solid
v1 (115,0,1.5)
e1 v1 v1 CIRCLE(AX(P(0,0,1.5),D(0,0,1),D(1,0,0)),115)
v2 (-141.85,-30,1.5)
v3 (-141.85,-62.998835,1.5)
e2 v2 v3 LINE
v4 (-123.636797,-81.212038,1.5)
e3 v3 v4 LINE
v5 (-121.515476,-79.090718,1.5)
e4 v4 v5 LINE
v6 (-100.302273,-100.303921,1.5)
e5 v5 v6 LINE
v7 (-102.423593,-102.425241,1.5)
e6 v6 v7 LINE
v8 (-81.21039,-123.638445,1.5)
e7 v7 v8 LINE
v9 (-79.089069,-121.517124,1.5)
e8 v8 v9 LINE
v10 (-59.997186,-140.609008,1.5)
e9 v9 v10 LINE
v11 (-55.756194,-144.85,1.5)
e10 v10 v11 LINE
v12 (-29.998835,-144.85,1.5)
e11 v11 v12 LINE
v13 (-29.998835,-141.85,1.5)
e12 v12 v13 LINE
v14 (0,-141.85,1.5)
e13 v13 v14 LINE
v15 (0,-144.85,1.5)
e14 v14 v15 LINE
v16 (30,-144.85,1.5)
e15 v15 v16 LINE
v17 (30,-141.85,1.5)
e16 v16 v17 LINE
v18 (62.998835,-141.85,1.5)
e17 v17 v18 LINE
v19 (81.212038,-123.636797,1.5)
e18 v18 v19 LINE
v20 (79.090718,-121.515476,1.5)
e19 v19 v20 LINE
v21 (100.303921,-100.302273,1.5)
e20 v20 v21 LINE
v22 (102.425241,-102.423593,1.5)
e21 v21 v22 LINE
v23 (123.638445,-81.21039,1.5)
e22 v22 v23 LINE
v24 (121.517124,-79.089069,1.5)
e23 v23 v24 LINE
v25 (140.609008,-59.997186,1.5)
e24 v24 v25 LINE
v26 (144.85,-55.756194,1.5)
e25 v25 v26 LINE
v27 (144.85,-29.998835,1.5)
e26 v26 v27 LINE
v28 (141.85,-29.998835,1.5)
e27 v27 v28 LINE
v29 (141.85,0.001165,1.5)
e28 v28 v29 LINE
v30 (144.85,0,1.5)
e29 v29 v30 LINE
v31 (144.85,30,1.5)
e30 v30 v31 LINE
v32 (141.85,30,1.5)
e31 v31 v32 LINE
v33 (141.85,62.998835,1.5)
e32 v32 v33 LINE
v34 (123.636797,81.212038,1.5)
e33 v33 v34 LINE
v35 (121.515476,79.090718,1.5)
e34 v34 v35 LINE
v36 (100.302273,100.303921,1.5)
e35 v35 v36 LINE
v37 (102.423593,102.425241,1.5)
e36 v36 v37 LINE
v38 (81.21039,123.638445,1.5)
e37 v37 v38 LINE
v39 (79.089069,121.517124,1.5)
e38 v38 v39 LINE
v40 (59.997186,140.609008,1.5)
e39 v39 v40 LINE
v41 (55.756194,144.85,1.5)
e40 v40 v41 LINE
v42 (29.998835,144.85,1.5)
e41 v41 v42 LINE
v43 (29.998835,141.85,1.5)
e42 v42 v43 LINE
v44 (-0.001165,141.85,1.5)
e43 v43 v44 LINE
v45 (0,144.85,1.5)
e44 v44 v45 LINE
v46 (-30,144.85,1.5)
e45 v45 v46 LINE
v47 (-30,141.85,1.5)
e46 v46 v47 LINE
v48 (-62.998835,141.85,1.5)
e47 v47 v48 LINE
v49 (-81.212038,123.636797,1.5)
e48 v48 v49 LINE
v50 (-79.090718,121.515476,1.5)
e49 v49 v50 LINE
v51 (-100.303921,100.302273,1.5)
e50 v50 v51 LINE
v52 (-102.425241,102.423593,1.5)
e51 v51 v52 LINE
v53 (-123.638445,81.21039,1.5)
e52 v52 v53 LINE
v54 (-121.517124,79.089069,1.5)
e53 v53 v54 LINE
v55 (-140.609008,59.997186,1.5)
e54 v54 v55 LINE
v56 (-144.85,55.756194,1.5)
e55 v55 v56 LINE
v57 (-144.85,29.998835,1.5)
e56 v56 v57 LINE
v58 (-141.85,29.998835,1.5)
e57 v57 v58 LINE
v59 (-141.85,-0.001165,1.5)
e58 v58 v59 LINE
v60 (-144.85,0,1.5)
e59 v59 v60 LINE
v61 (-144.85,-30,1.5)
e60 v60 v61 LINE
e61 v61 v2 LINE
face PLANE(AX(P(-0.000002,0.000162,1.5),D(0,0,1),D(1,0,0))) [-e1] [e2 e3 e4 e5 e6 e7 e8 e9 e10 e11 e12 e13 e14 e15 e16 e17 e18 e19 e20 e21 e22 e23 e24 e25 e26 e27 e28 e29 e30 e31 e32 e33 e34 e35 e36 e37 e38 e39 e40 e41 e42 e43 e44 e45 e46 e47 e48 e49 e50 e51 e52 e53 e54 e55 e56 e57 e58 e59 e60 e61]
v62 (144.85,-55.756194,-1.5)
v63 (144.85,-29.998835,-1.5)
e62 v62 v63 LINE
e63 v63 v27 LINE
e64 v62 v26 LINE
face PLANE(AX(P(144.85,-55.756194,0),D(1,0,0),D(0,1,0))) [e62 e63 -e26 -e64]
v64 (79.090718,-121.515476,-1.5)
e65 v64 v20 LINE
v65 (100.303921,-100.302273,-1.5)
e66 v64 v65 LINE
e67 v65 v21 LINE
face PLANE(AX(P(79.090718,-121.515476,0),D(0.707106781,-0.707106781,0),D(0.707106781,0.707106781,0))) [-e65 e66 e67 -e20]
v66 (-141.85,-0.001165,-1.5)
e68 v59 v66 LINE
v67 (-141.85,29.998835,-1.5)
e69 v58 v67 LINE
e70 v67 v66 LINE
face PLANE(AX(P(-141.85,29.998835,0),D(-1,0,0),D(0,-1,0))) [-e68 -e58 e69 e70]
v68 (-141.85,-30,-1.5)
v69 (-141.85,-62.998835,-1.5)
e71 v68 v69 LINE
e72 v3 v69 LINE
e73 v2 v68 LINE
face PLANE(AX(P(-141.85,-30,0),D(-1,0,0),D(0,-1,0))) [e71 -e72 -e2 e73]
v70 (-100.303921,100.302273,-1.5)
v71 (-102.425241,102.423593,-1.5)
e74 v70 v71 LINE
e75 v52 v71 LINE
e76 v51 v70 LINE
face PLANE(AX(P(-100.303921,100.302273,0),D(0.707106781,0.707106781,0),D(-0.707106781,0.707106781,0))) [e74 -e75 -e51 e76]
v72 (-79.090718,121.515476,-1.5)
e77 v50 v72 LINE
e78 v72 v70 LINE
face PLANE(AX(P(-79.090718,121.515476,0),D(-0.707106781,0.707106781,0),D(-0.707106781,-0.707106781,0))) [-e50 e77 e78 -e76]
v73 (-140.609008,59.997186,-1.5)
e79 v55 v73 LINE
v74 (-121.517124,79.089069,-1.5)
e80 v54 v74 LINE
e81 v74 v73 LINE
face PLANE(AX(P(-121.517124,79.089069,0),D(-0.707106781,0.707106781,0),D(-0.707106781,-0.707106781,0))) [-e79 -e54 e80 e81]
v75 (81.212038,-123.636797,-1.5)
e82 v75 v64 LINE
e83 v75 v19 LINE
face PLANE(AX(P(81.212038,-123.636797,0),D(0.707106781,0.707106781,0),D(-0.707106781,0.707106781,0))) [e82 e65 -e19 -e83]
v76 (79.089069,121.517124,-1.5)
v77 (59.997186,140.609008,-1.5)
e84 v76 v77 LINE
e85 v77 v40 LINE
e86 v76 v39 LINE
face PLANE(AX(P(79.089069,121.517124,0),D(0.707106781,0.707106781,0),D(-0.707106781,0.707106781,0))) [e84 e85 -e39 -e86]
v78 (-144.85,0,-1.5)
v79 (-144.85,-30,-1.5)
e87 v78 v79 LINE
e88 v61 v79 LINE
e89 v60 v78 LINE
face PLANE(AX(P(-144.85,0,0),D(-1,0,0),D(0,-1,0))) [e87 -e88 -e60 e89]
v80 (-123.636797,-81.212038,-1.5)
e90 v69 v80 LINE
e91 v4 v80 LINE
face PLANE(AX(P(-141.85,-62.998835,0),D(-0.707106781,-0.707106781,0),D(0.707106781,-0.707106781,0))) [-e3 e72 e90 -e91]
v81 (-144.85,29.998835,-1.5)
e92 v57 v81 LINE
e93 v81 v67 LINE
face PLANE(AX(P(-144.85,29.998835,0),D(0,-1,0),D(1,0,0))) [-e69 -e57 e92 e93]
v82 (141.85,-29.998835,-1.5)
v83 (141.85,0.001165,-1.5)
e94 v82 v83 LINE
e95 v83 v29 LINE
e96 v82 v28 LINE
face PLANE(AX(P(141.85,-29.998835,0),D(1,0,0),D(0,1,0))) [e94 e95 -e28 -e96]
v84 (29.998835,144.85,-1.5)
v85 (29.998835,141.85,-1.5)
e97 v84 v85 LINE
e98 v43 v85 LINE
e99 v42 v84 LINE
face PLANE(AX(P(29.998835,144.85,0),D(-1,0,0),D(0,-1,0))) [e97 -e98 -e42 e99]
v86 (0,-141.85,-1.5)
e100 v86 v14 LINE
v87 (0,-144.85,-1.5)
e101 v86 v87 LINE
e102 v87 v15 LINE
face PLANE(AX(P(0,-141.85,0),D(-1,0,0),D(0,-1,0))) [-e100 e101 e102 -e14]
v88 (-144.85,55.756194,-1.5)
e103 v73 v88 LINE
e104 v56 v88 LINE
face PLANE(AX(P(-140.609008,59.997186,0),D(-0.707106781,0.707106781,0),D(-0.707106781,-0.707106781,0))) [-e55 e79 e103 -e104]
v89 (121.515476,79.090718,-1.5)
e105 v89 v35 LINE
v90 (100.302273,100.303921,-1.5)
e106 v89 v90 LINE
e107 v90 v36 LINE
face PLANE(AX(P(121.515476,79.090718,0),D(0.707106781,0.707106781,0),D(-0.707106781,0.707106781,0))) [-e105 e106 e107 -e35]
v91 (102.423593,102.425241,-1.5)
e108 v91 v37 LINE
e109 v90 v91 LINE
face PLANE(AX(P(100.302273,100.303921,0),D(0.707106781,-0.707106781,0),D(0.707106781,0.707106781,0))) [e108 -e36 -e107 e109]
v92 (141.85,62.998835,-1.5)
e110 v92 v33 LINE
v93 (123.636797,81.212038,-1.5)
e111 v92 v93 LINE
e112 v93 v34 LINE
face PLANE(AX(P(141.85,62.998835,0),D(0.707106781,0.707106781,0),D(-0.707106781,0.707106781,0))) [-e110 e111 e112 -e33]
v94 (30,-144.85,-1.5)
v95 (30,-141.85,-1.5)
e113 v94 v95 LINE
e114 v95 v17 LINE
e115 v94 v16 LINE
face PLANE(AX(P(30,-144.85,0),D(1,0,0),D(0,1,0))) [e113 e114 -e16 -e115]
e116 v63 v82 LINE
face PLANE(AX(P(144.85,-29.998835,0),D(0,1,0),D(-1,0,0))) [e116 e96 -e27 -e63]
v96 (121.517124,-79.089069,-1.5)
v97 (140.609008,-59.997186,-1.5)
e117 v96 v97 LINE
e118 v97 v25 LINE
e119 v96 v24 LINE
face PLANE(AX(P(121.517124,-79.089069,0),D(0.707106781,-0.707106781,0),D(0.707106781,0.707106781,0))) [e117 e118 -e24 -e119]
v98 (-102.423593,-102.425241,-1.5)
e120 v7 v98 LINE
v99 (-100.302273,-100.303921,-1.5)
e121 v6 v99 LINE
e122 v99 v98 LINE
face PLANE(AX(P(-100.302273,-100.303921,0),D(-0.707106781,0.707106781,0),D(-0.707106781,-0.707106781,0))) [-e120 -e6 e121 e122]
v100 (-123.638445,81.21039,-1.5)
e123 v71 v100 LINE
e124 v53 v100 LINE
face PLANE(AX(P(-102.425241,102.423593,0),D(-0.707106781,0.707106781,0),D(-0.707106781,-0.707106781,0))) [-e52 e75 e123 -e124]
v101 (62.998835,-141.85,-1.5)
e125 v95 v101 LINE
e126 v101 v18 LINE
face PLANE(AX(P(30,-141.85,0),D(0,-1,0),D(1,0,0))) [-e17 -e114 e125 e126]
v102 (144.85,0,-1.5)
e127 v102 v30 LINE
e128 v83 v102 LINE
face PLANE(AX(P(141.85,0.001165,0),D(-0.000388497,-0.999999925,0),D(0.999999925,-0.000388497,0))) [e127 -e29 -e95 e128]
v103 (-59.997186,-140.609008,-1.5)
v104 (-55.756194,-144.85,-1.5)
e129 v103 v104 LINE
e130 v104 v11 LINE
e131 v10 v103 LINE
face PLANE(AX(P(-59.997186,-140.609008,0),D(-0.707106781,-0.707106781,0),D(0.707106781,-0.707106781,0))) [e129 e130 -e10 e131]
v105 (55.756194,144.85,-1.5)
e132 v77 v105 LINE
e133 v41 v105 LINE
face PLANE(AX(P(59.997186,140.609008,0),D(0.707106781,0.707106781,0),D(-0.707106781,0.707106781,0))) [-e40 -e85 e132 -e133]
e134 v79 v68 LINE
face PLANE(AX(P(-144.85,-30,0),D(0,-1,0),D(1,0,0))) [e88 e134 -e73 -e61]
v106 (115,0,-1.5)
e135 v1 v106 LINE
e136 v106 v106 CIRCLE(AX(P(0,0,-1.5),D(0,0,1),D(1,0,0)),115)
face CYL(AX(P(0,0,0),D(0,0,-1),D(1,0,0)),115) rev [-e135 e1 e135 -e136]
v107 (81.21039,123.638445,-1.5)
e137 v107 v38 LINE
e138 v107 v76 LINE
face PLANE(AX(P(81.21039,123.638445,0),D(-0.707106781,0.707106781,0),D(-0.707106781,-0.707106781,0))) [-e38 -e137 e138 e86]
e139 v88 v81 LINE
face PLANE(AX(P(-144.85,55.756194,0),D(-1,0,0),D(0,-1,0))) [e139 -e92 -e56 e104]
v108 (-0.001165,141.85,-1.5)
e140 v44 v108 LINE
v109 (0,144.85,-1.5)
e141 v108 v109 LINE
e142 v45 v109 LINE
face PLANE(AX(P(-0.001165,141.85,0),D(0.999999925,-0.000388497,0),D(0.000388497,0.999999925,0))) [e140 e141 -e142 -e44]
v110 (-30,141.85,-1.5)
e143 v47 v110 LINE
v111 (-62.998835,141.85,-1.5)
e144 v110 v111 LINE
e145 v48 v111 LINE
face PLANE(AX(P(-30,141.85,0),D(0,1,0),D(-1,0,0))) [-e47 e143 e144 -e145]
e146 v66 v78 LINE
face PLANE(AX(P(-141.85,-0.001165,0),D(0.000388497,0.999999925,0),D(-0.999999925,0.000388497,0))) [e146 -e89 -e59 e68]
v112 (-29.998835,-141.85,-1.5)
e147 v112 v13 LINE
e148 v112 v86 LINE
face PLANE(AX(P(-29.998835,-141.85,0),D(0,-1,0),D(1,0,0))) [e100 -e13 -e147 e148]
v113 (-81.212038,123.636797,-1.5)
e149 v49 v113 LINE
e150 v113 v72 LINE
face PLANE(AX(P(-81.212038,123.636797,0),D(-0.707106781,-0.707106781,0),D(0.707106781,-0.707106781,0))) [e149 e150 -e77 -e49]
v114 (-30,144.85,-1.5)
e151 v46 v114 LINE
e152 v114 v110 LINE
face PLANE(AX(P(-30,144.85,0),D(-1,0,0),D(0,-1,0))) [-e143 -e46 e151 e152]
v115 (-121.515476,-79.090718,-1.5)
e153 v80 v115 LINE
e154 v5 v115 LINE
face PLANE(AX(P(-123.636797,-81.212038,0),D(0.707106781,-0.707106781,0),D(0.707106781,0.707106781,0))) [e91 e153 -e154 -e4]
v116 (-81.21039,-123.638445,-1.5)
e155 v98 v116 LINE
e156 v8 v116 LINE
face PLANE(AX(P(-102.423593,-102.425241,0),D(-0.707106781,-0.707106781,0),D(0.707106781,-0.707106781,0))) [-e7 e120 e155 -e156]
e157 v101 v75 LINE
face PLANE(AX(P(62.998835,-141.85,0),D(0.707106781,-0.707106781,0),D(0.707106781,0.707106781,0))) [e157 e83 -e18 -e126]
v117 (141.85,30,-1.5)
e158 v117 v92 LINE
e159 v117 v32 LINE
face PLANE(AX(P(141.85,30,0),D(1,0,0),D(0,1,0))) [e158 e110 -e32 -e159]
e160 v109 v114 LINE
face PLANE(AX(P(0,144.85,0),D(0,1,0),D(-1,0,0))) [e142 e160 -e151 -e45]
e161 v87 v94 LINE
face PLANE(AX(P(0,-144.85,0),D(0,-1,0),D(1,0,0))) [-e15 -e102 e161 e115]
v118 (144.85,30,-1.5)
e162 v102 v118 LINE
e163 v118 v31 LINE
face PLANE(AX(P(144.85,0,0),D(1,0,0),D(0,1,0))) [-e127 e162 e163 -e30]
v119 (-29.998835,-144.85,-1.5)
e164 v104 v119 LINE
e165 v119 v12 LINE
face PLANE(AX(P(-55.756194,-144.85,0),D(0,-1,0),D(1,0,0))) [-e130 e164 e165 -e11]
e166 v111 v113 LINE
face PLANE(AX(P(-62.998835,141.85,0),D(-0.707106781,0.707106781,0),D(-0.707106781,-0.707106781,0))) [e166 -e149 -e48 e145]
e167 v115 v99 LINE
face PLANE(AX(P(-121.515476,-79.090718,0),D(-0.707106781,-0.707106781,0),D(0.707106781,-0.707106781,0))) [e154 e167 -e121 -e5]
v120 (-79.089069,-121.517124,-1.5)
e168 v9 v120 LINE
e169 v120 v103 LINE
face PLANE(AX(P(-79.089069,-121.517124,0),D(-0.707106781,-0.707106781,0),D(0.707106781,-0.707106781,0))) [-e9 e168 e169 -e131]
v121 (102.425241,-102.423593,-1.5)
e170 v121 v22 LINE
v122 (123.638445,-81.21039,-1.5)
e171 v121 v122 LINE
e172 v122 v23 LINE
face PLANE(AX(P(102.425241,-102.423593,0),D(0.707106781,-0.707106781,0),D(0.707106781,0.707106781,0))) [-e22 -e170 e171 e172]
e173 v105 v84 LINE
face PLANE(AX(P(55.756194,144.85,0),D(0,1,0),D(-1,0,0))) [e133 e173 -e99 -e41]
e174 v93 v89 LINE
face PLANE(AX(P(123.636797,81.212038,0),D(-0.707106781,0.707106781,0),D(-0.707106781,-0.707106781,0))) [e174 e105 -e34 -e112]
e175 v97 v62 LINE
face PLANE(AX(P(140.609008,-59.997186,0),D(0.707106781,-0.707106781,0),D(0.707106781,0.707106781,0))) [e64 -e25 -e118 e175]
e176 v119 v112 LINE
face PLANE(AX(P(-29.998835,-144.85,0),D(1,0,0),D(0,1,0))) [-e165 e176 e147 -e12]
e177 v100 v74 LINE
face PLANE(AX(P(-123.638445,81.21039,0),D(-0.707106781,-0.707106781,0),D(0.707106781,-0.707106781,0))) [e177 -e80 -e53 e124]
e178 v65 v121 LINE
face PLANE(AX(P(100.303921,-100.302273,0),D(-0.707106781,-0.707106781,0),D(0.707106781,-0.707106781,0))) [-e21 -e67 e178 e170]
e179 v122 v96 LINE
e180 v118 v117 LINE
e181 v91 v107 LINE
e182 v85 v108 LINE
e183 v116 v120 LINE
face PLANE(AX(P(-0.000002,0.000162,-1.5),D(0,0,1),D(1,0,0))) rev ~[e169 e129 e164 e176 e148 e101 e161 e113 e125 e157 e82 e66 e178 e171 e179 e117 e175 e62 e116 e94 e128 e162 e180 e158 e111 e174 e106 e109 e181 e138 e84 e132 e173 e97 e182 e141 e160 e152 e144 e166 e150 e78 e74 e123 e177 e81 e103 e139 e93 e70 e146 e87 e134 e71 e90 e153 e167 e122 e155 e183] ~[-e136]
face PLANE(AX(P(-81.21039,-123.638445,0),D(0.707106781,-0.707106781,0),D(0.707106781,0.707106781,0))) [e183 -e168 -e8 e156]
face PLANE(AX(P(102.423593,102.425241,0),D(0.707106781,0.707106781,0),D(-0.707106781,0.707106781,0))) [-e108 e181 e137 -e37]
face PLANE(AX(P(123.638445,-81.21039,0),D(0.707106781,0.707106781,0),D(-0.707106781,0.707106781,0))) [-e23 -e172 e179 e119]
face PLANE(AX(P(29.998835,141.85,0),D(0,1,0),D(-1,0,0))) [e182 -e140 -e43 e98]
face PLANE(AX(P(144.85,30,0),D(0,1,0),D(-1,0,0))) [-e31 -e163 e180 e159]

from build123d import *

# Parameters (mm, degrees)
F0_R     = 115
F1_DEPTH = 1.5


with BuildPart() as f1:
    # F0 (on Top) → F1 (new body, symmetric)
    with BuildSketch(Plane.XY):
        Polygon((-59.9971862603, -140.6090075683), (-55.7561938299, -144.85), (-29.9988345097, -144.85), (-29.9988345097, -141.85), (0, -141.85), (0, -144.85), (30, -144.85), (30, -141.85), (56.9988345097, -141.85), (62.9988345097, -141.85), (81.2120379453, -123.6367965644), (79.0907176018, -121.5154762208), (100.3039210374, -100.3022727852), (102.4252413809, -102.4235931288), (123.6384448165, -81.2103896932), (121.517124473, -79.0890693497), (140.609007565, -59.9971862576), (144.85, -55.7561938226), (144.85, -29.9988345097), (141.85, -29.9988345097), (141.85, 0.0011654903), (144.85, 0), (144.85, 30), (141.85, 30), (141.85, 57), (141.85, 62.9988345097), (123.6367965644, 81.2120379453), (121.5154762208, 79.0907176018), (100.3022727852, 100.3039210374), (102.4235931255, 102.4252413776), (81.2103896932, 123.6384448165), (79.0890693497, 121.517124473), (59.9971862576, 140.609007565), (55.7561938226, 144.85), (29.9988345097, 144.85), (29.9988345097, 141.85), (-0.0011654903, 141.85), (0, 144.85), (-30, 144.85), (-30, 141.85), (-57, 141.85), (-62.9988345097, 141.85), (-81.2120379453, 123.6367965644), (-79.0907176018, 121.5154762208), (-100.3039210374, 100.3022727852), (-102.4252413776, 102.4235931255), (-123.6384448165, 81.2103896932), (-121.5171244733, 79.0890693493), (-140.6090075683, 59.9971862603), (-144.85, 55.7561938286), (-144.85, 29.9988345097), (-141.85, 29.9988345097), (-141.85, -0.0011654903), (-144.85, 0), (-144.85, -30), (-141.85, -30), (-141.85, -57), (-141.85, -62.9988345097), (-123.6367965644, -81.2120379453), (-121.5154762208, -79.0907176018), (-100.3022727852, -100.3039210374), (-102.4235931255, -102.4252413776), (-81.2103896932, -123.6384448165), (-79.0890693493, -121.5171244733), align=None)
        Circle(F0_R, mode=Mode.SUBTRACT)
    extrude(amount=F1_DEPTH, both=True)


solid = f1.part
